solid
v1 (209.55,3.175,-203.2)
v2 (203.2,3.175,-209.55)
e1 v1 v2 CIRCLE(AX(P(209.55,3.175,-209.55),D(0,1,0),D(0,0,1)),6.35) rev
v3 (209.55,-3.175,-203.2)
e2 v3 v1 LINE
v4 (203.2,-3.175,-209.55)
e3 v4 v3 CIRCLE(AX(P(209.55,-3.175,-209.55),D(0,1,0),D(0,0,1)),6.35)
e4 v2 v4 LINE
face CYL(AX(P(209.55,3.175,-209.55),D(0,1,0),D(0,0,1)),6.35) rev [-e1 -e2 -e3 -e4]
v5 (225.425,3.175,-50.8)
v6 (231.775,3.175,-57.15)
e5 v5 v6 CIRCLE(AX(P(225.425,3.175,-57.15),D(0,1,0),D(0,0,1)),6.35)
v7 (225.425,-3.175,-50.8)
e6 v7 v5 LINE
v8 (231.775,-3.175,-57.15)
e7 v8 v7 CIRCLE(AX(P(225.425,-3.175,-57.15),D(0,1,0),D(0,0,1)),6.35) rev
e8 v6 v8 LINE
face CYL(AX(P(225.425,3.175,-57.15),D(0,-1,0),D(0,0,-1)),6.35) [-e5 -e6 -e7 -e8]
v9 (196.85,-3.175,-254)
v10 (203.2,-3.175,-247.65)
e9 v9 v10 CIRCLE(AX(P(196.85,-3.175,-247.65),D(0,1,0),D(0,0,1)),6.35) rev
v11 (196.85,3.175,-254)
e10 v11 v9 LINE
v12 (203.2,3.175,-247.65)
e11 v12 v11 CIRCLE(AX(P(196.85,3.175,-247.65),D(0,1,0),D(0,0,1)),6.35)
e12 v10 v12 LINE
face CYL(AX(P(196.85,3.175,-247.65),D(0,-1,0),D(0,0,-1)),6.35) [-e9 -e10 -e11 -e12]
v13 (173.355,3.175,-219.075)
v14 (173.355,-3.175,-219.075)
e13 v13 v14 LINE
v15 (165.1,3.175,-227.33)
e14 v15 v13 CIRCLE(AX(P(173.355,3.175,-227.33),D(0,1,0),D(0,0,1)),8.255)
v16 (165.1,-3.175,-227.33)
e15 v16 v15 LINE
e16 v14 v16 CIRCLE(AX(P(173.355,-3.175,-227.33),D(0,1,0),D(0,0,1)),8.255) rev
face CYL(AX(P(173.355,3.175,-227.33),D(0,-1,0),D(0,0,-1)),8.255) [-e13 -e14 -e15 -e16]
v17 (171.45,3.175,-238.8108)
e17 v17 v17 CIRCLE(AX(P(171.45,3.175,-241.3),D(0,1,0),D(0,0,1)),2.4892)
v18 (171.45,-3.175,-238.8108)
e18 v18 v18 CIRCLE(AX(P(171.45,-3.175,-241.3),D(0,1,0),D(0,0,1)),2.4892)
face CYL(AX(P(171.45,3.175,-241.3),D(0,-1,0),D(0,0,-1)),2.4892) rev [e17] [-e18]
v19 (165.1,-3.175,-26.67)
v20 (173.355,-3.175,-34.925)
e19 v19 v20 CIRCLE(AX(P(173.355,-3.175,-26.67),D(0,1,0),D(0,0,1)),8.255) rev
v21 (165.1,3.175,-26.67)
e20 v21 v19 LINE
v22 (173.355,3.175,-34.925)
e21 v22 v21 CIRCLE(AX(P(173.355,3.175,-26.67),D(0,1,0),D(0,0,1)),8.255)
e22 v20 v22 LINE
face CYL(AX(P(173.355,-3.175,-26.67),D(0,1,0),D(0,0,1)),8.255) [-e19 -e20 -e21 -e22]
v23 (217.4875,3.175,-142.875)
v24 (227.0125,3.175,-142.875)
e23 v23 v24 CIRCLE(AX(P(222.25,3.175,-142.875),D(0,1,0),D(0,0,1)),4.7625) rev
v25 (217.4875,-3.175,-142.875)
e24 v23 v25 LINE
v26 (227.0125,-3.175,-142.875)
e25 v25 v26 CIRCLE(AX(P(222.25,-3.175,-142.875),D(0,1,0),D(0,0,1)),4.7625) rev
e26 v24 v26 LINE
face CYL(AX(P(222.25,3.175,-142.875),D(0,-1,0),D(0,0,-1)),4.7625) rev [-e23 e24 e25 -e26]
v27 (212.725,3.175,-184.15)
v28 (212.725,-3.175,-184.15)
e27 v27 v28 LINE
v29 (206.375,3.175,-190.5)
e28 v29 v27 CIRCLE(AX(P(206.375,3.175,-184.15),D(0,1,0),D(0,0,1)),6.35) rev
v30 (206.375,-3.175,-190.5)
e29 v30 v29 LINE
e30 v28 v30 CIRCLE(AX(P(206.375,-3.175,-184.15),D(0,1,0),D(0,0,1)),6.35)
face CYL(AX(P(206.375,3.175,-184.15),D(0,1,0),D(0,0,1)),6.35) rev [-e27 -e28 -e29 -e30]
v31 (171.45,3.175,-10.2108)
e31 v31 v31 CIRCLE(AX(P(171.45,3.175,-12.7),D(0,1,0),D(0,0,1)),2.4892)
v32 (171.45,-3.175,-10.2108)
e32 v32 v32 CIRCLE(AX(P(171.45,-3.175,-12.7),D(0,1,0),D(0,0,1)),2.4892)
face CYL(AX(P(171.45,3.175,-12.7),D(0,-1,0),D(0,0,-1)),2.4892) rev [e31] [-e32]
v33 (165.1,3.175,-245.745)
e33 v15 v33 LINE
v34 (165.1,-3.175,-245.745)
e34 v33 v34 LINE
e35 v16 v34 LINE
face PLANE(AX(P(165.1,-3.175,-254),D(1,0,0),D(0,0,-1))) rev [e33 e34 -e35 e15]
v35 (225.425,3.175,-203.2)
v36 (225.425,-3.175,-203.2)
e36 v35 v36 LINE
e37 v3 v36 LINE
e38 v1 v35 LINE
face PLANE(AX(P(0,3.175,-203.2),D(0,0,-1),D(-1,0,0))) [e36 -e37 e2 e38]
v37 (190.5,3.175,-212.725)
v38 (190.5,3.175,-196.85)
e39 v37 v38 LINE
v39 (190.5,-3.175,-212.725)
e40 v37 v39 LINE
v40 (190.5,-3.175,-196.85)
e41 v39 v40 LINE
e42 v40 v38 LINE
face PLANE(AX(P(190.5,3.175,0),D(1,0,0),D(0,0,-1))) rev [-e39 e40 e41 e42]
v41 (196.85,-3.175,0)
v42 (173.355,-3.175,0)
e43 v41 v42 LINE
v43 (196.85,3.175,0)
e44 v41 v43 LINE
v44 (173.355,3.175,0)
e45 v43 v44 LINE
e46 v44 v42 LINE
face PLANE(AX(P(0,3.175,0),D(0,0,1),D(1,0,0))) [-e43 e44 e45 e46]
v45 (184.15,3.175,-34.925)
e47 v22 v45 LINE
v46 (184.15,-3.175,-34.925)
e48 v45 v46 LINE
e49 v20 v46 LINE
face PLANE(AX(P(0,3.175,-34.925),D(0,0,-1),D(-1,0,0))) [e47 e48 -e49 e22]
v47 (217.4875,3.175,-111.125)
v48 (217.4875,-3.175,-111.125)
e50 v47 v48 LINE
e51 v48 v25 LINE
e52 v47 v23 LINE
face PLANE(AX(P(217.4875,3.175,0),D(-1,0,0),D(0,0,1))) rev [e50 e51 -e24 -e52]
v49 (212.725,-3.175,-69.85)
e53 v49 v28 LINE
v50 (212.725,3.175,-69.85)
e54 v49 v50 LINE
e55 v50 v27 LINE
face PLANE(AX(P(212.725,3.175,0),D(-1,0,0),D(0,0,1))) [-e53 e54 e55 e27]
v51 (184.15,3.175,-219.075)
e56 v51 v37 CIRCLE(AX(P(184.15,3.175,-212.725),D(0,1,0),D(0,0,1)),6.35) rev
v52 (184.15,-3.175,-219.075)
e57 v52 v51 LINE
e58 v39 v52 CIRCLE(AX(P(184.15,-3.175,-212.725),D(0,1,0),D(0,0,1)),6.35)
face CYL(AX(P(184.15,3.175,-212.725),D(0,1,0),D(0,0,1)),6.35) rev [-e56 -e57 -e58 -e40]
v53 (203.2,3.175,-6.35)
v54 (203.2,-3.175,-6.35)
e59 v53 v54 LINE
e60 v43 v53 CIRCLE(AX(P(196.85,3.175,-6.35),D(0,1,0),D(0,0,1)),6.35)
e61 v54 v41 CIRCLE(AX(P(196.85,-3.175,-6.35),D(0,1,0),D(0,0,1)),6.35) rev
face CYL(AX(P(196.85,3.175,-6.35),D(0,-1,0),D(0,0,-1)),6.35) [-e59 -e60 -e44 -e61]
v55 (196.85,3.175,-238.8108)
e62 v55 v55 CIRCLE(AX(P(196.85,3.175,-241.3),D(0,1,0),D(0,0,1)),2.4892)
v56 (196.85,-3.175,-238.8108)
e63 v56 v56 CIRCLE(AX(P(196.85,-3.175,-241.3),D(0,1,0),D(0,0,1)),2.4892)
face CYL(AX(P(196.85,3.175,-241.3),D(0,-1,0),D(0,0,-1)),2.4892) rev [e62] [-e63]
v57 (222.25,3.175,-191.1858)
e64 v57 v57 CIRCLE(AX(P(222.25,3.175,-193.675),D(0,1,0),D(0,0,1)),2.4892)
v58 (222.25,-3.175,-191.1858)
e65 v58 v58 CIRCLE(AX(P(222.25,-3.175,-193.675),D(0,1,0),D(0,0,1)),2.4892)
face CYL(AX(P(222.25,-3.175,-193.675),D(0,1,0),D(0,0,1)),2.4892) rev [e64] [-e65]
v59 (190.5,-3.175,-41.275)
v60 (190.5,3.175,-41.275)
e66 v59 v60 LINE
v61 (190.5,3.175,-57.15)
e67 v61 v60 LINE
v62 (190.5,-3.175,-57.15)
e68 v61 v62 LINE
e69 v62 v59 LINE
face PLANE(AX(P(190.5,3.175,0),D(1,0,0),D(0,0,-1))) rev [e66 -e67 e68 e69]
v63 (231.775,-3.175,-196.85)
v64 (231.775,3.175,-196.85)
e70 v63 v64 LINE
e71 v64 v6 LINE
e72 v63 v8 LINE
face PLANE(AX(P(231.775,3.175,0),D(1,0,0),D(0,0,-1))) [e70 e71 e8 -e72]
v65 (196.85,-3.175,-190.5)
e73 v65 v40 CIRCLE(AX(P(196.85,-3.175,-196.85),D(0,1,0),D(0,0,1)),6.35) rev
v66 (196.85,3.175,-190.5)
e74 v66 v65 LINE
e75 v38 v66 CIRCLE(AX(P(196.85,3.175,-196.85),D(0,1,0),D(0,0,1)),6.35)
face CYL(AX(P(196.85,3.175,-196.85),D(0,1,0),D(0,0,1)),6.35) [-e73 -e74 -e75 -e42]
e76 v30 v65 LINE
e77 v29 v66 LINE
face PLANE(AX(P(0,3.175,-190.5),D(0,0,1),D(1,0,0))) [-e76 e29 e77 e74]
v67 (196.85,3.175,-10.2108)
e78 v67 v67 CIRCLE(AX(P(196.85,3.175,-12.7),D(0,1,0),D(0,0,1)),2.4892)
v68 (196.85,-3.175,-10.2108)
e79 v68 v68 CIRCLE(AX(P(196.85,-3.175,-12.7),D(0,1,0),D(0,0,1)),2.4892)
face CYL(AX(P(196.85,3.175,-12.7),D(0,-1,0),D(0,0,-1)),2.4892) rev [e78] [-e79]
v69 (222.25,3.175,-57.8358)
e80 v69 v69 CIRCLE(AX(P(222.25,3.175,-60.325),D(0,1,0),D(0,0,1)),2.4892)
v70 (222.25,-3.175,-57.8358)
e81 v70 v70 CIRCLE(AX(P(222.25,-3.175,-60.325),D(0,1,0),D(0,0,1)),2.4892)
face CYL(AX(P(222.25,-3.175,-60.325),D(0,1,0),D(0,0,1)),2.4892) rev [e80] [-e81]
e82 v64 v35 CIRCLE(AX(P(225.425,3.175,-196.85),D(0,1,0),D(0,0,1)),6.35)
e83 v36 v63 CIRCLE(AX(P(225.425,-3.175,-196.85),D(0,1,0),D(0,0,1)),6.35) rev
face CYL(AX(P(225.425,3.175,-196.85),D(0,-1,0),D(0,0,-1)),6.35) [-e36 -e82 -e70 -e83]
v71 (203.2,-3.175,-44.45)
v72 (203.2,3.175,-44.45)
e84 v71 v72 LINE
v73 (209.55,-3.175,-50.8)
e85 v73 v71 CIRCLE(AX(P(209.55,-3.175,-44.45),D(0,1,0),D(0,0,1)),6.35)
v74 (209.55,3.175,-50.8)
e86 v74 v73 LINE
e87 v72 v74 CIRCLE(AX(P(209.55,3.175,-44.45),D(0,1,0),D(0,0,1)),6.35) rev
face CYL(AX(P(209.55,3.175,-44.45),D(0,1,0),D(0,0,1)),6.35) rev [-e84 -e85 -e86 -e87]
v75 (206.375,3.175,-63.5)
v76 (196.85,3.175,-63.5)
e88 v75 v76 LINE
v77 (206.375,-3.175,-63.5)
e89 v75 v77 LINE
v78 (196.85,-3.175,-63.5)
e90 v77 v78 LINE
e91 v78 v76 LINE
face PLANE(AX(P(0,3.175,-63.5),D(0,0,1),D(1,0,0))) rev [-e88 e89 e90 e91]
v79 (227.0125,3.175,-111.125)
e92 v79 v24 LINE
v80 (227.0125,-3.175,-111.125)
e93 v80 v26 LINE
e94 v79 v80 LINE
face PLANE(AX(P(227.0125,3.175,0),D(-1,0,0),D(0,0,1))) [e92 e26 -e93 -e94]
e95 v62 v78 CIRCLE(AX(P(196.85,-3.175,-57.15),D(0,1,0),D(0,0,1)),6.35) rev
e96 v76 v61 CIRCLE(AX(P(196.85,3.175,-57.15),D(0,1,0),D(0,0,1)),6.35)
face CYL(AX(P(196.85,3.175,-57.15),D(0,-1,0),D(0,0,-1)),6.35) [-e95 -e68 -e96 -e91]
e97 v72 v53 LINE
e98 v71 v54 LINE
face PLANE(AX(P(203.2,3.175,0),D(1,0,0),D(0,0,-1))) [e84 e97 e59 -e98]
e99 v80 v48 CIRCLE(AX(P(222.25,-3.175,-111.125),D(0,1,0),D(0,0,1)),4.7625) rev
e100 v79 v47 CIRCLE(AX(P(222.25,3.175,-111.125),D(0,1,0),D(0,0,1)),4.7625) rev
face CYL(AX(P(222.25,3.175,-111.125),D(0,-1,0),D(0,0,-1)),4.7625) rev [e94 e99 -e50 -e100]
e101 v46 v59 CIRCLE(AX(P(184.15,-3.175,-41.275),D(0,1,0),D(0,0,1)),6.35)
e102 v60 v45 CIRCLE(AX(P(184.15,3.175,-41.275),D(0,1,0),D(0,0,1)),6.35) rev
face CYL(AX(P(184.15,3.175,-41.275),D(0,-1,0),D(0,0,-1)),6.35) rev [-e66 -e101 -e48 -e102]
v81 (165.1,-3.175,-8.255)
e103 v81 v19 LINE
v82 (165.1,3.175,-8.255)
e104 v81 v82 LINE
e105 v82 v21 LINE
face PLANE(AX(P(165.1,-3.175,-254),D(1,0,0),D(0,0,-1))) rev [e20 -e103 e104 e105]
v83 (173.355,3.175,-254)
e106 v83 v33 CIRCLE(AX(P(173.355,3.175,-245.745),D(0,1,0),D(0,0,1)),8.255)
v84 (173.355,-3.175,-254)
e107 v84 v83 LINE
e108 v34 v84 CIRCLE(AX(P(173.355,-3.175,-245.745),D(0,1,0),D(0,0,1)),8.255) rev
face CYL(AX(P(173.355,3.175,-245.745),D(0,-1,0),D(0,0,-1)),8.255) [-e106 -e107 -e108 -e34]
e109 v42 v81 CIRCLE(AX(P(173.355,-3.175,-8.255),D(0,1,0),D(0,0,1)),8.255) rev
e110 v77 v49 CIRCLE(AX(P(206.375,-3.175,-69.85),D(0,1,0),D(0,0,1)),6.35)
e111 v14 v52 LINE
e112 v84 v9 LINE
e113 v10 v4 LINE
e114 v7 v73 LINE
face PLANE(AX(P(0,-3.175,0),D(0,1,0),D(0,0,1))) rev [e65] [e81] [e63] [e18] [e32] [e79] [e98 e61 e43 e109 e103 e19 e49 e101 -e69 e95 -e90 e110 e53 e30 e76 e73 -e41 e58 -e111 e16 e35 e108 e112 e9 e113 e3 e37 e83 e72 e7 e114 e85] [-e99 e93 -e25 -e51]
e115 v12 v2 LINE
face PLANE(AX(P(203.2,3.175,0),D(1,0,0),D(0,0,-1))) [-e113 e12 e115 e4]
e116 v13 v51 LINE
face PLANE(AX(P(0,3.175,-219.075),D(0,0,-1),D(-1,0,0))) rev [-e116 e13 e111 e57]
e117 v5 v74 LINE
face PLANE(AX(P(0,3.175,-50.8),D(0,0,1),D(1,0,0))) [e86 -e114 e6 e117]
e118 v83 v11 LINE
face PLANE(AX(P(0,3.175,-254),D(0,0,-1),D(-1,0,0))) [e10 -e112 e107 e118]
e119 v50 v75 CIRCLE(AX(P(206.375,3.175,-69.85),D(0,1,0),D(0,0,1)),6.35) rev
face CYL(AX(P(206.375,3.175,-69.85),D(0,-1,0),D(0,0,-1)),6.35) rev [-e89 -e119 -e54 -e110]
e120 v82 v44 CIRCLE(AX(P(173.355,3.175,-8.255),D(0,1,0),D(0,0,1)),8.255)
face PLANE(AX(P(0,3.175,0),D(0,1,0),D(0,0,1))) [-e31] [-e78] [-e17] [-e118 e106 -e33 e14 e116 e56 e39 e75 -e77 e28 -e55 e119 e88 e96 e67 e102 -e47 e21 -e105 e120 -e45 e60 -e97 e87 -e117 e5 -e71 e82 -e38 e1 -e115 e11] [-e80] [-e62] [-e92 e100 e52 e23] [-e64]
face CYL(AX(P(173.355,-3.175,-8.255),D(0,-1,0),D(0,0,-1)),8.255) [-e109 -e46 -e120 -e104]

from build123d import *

# Parameters (mm, degrees)
SKETCH1_R           = 2.4892
BOSS_EXTRUDE1_DEPTH = 3.175
FILLET1_R           = 6.35
LPATTERN1_START     = -3.175
LPATTERN1_OUTLINE_R = 2.4892
LPATTERN1_DEPTH     = 6.35
SKETCH2_R           = 2.4892
SKETCH2_W           = 193.675
SKETCH2_H           = 254
CUT_EXTRUDE1_DEPTH  = 344.912740568
FILLET2_R           = 8.255


# Read off the part's stored shape, not the designer's step: LPattern1
with BuildPart() as part:
    # Sketch1 → Boss-Extrude1 (new, symmetric)
    with BuildSketch(Plane(origin=(0, 0, 0), x_dir=(1, 0, 0), z_dir=(0, 1, 0))):
        Polygon((0, 50.8), (0, 0), (203.2, 0), (203.2, 50.8), (231.775, 50.8), (231.775, 203.2), (203.2, 203.2), (203.2, 254), (0, 254), (0, 203.2), (-28.575, 203.2), (-28.575, 50.8), align=None)
        with Locations(Location((196.85, 12.7, 0), (0, 0, 270))):
            Circle(SKETCH1_R, mode=Mode.SUBTRACT)
        Polygon((12.7, 190.5), (12.7, 219.075), (190.5, 219.075), (190.5, 190.5), (212.725, 190.5), (212.725, 63.5), (190.5, 63.5), (190.5, 34.925), (12.7, 34.925), (12.7, 63.5), (-9.525, 63.5), (-9.525, 190.5), align=None, mode=Mode.SUBTRACT)
        with BuildLine():
            Line((227.0125, 142.875), (227.0125, 111.125))
            ThreePointArc((227.0125, 111.125), (222.25, 106.3625), (217.4875, 111.125))
            Line((217.4875, 111.125), (217.4875, 142.875))
            ThreePointArc((217.4875, 142.875), (222.25, 147.6375), (227.0125, 142.875))
        make_face(mode=Mode.SUBTRACT)
        with BuildLine():
            ThreePointArc((-14.2875, 111.125), (-19.05, 106.3625), (-23.8125, 111.125))
            Line((-23.8125, 111.125), (-23.8125, 142.875))
            ThreePointArc((-23.8125, 142.875), (-19.05, 147.6375), (-14.2875, 142.875))
            Line((-14.2875, 142.875), (-14.2875, 111.125))
        make_face(mode=Mode.SUBTRACT)
        with Locations(Location((196.85, 241.3, 0), (0, 0, 270))):
            Circle(SKETCH1_R, mode=Mode.SUBTRACT)
    extrude(amount=BOSS_EXTRUDE1_DEPTH, both=True)

    # Fillet1
    fillet1_edges = [part.edges().sort_by_distance(p)[0] for p in [
        (0, 0, 0),
        (0, 0, -50.8),
        (-28.575, 0, -50.8),
        (-28.575, 0, -203.2),
        (0, 0, -203.2),
        (0, 0, -254),
        (203.2, 0, -254),
        (203.2, 0, -203.2),
        (231.775, 0, -203.2),
        (231.775, 0, -50.8),
        (203.2, 0, -50.8),
        (203.2, 0, 0),
        (212.725, 0, -190.5),
        (190.5, 0, -190.5),
        (190.5, 0, -219.075),
        (12.7, 0, -219.075),
        (12.7, 0, -190.5),
        (-9.525, 0, -190.5),
        (-9.525, 0, -63.5),
        (12.7, 0, -63.5),
        (12.7, 0, -34.925),
        (190.5, 0, -34.925),
        (190.5, 0, -63.5),
        (212.725, 0, -63.5),
    ]]
    fillet(fillet1_edges, radius=FILLET1_R)

    # LPattern1 outline → LPattern1 (cut)
    with BuildSketch(Plane(origin=(0, 0, 0), x_dir=(1, 0, 0), z_dir=(0, 1, 0)).offset(LPATTERN1_START)):
        with Locations((19.05, 12.7)):
            Circle(LPATTERN1_OUTLINE_R)
        with Locations((19.05, 241.3)):
            Circle(LPATTERN1_OUTLINE_R)
        with Locations((44.45, 12.7)):
            Circle(LPATTERN1_OUTLINE_R)
        with Locations((44.45, 241.3)):
            Circle(LPATTERN1_OUTLINE_R)
        with Locations((69.85, 12.7)):
            Circle(LPATTERN1_OUTLINE_R)
        with Locations((69.85, 241.3)):
            Circle(LPATTERN1_OUTLINE_R)
        with Locations((95.25, 12.7)):
            Circle(LPATTERN1_OUTLINE_R)
        with Locations((95.25, 241.3)):
            Circle(LPATTERN1_OUTLINE_R)
        with Locations((120.65, 12.7)):
            Circle(LPATTERN1_OUTLINE_R)
        with Locations((120.65, 241.3)):
            Circle(LPATTERN1_OUTLINE_R)
        with Locations((146.05, 12.7)):
            Circle(LPATTERN1_OUTLINE_R)
        with Locations((146.05, 241.3)):
            Circle(LPATTERN1_OUTLINE_R)
        with Locations((171.45, 12.7)):
            Circle(LPATTERN1_OUTLINE_R)
        with Locations((171.45, 241.3)):
            Circle(LPATTERN1_OUTLINE_R)
    extrude(amount=LPATTERN1_DEPTH, mode=Mode.SUBTRACT)

    # Sketch2 → Cut-Extrude1 (cut, through all)
    with BuildSketch(Plane(origin=(0, 3.175, 0), x_dir=(1, 0, 0), z_dir=(0, 1, 0))):
        with Locations(Location((222.25, 193.675, 0), (0, 0, 270))):
            Circle(SKETCH2_R)
        with Locations(Location((222.25, 60.325, 0), (0, 0, 270))):
            Circle(SKETCH2_R)
        with Locations((68.2625, 127)):
            Rectangle(SKETCH2_W, SKETCH2_H)
    extrude(amount=-CUT_EXTRUDE1_DEPTH, mode=Mode.SUBTRACT)

    # Fillet2
    fillet2_edges = [part.edges().sort_by_distance(p)[0] for p in [
        (165.1, 0, -34.925),
        (165.1, 0, -219.075),
        (165.1, 0, -254),
        (165.1, 0, 0),
    ]]
    fillet(fillet2_edges, radius=FILLET2_R)


solid = part.part
